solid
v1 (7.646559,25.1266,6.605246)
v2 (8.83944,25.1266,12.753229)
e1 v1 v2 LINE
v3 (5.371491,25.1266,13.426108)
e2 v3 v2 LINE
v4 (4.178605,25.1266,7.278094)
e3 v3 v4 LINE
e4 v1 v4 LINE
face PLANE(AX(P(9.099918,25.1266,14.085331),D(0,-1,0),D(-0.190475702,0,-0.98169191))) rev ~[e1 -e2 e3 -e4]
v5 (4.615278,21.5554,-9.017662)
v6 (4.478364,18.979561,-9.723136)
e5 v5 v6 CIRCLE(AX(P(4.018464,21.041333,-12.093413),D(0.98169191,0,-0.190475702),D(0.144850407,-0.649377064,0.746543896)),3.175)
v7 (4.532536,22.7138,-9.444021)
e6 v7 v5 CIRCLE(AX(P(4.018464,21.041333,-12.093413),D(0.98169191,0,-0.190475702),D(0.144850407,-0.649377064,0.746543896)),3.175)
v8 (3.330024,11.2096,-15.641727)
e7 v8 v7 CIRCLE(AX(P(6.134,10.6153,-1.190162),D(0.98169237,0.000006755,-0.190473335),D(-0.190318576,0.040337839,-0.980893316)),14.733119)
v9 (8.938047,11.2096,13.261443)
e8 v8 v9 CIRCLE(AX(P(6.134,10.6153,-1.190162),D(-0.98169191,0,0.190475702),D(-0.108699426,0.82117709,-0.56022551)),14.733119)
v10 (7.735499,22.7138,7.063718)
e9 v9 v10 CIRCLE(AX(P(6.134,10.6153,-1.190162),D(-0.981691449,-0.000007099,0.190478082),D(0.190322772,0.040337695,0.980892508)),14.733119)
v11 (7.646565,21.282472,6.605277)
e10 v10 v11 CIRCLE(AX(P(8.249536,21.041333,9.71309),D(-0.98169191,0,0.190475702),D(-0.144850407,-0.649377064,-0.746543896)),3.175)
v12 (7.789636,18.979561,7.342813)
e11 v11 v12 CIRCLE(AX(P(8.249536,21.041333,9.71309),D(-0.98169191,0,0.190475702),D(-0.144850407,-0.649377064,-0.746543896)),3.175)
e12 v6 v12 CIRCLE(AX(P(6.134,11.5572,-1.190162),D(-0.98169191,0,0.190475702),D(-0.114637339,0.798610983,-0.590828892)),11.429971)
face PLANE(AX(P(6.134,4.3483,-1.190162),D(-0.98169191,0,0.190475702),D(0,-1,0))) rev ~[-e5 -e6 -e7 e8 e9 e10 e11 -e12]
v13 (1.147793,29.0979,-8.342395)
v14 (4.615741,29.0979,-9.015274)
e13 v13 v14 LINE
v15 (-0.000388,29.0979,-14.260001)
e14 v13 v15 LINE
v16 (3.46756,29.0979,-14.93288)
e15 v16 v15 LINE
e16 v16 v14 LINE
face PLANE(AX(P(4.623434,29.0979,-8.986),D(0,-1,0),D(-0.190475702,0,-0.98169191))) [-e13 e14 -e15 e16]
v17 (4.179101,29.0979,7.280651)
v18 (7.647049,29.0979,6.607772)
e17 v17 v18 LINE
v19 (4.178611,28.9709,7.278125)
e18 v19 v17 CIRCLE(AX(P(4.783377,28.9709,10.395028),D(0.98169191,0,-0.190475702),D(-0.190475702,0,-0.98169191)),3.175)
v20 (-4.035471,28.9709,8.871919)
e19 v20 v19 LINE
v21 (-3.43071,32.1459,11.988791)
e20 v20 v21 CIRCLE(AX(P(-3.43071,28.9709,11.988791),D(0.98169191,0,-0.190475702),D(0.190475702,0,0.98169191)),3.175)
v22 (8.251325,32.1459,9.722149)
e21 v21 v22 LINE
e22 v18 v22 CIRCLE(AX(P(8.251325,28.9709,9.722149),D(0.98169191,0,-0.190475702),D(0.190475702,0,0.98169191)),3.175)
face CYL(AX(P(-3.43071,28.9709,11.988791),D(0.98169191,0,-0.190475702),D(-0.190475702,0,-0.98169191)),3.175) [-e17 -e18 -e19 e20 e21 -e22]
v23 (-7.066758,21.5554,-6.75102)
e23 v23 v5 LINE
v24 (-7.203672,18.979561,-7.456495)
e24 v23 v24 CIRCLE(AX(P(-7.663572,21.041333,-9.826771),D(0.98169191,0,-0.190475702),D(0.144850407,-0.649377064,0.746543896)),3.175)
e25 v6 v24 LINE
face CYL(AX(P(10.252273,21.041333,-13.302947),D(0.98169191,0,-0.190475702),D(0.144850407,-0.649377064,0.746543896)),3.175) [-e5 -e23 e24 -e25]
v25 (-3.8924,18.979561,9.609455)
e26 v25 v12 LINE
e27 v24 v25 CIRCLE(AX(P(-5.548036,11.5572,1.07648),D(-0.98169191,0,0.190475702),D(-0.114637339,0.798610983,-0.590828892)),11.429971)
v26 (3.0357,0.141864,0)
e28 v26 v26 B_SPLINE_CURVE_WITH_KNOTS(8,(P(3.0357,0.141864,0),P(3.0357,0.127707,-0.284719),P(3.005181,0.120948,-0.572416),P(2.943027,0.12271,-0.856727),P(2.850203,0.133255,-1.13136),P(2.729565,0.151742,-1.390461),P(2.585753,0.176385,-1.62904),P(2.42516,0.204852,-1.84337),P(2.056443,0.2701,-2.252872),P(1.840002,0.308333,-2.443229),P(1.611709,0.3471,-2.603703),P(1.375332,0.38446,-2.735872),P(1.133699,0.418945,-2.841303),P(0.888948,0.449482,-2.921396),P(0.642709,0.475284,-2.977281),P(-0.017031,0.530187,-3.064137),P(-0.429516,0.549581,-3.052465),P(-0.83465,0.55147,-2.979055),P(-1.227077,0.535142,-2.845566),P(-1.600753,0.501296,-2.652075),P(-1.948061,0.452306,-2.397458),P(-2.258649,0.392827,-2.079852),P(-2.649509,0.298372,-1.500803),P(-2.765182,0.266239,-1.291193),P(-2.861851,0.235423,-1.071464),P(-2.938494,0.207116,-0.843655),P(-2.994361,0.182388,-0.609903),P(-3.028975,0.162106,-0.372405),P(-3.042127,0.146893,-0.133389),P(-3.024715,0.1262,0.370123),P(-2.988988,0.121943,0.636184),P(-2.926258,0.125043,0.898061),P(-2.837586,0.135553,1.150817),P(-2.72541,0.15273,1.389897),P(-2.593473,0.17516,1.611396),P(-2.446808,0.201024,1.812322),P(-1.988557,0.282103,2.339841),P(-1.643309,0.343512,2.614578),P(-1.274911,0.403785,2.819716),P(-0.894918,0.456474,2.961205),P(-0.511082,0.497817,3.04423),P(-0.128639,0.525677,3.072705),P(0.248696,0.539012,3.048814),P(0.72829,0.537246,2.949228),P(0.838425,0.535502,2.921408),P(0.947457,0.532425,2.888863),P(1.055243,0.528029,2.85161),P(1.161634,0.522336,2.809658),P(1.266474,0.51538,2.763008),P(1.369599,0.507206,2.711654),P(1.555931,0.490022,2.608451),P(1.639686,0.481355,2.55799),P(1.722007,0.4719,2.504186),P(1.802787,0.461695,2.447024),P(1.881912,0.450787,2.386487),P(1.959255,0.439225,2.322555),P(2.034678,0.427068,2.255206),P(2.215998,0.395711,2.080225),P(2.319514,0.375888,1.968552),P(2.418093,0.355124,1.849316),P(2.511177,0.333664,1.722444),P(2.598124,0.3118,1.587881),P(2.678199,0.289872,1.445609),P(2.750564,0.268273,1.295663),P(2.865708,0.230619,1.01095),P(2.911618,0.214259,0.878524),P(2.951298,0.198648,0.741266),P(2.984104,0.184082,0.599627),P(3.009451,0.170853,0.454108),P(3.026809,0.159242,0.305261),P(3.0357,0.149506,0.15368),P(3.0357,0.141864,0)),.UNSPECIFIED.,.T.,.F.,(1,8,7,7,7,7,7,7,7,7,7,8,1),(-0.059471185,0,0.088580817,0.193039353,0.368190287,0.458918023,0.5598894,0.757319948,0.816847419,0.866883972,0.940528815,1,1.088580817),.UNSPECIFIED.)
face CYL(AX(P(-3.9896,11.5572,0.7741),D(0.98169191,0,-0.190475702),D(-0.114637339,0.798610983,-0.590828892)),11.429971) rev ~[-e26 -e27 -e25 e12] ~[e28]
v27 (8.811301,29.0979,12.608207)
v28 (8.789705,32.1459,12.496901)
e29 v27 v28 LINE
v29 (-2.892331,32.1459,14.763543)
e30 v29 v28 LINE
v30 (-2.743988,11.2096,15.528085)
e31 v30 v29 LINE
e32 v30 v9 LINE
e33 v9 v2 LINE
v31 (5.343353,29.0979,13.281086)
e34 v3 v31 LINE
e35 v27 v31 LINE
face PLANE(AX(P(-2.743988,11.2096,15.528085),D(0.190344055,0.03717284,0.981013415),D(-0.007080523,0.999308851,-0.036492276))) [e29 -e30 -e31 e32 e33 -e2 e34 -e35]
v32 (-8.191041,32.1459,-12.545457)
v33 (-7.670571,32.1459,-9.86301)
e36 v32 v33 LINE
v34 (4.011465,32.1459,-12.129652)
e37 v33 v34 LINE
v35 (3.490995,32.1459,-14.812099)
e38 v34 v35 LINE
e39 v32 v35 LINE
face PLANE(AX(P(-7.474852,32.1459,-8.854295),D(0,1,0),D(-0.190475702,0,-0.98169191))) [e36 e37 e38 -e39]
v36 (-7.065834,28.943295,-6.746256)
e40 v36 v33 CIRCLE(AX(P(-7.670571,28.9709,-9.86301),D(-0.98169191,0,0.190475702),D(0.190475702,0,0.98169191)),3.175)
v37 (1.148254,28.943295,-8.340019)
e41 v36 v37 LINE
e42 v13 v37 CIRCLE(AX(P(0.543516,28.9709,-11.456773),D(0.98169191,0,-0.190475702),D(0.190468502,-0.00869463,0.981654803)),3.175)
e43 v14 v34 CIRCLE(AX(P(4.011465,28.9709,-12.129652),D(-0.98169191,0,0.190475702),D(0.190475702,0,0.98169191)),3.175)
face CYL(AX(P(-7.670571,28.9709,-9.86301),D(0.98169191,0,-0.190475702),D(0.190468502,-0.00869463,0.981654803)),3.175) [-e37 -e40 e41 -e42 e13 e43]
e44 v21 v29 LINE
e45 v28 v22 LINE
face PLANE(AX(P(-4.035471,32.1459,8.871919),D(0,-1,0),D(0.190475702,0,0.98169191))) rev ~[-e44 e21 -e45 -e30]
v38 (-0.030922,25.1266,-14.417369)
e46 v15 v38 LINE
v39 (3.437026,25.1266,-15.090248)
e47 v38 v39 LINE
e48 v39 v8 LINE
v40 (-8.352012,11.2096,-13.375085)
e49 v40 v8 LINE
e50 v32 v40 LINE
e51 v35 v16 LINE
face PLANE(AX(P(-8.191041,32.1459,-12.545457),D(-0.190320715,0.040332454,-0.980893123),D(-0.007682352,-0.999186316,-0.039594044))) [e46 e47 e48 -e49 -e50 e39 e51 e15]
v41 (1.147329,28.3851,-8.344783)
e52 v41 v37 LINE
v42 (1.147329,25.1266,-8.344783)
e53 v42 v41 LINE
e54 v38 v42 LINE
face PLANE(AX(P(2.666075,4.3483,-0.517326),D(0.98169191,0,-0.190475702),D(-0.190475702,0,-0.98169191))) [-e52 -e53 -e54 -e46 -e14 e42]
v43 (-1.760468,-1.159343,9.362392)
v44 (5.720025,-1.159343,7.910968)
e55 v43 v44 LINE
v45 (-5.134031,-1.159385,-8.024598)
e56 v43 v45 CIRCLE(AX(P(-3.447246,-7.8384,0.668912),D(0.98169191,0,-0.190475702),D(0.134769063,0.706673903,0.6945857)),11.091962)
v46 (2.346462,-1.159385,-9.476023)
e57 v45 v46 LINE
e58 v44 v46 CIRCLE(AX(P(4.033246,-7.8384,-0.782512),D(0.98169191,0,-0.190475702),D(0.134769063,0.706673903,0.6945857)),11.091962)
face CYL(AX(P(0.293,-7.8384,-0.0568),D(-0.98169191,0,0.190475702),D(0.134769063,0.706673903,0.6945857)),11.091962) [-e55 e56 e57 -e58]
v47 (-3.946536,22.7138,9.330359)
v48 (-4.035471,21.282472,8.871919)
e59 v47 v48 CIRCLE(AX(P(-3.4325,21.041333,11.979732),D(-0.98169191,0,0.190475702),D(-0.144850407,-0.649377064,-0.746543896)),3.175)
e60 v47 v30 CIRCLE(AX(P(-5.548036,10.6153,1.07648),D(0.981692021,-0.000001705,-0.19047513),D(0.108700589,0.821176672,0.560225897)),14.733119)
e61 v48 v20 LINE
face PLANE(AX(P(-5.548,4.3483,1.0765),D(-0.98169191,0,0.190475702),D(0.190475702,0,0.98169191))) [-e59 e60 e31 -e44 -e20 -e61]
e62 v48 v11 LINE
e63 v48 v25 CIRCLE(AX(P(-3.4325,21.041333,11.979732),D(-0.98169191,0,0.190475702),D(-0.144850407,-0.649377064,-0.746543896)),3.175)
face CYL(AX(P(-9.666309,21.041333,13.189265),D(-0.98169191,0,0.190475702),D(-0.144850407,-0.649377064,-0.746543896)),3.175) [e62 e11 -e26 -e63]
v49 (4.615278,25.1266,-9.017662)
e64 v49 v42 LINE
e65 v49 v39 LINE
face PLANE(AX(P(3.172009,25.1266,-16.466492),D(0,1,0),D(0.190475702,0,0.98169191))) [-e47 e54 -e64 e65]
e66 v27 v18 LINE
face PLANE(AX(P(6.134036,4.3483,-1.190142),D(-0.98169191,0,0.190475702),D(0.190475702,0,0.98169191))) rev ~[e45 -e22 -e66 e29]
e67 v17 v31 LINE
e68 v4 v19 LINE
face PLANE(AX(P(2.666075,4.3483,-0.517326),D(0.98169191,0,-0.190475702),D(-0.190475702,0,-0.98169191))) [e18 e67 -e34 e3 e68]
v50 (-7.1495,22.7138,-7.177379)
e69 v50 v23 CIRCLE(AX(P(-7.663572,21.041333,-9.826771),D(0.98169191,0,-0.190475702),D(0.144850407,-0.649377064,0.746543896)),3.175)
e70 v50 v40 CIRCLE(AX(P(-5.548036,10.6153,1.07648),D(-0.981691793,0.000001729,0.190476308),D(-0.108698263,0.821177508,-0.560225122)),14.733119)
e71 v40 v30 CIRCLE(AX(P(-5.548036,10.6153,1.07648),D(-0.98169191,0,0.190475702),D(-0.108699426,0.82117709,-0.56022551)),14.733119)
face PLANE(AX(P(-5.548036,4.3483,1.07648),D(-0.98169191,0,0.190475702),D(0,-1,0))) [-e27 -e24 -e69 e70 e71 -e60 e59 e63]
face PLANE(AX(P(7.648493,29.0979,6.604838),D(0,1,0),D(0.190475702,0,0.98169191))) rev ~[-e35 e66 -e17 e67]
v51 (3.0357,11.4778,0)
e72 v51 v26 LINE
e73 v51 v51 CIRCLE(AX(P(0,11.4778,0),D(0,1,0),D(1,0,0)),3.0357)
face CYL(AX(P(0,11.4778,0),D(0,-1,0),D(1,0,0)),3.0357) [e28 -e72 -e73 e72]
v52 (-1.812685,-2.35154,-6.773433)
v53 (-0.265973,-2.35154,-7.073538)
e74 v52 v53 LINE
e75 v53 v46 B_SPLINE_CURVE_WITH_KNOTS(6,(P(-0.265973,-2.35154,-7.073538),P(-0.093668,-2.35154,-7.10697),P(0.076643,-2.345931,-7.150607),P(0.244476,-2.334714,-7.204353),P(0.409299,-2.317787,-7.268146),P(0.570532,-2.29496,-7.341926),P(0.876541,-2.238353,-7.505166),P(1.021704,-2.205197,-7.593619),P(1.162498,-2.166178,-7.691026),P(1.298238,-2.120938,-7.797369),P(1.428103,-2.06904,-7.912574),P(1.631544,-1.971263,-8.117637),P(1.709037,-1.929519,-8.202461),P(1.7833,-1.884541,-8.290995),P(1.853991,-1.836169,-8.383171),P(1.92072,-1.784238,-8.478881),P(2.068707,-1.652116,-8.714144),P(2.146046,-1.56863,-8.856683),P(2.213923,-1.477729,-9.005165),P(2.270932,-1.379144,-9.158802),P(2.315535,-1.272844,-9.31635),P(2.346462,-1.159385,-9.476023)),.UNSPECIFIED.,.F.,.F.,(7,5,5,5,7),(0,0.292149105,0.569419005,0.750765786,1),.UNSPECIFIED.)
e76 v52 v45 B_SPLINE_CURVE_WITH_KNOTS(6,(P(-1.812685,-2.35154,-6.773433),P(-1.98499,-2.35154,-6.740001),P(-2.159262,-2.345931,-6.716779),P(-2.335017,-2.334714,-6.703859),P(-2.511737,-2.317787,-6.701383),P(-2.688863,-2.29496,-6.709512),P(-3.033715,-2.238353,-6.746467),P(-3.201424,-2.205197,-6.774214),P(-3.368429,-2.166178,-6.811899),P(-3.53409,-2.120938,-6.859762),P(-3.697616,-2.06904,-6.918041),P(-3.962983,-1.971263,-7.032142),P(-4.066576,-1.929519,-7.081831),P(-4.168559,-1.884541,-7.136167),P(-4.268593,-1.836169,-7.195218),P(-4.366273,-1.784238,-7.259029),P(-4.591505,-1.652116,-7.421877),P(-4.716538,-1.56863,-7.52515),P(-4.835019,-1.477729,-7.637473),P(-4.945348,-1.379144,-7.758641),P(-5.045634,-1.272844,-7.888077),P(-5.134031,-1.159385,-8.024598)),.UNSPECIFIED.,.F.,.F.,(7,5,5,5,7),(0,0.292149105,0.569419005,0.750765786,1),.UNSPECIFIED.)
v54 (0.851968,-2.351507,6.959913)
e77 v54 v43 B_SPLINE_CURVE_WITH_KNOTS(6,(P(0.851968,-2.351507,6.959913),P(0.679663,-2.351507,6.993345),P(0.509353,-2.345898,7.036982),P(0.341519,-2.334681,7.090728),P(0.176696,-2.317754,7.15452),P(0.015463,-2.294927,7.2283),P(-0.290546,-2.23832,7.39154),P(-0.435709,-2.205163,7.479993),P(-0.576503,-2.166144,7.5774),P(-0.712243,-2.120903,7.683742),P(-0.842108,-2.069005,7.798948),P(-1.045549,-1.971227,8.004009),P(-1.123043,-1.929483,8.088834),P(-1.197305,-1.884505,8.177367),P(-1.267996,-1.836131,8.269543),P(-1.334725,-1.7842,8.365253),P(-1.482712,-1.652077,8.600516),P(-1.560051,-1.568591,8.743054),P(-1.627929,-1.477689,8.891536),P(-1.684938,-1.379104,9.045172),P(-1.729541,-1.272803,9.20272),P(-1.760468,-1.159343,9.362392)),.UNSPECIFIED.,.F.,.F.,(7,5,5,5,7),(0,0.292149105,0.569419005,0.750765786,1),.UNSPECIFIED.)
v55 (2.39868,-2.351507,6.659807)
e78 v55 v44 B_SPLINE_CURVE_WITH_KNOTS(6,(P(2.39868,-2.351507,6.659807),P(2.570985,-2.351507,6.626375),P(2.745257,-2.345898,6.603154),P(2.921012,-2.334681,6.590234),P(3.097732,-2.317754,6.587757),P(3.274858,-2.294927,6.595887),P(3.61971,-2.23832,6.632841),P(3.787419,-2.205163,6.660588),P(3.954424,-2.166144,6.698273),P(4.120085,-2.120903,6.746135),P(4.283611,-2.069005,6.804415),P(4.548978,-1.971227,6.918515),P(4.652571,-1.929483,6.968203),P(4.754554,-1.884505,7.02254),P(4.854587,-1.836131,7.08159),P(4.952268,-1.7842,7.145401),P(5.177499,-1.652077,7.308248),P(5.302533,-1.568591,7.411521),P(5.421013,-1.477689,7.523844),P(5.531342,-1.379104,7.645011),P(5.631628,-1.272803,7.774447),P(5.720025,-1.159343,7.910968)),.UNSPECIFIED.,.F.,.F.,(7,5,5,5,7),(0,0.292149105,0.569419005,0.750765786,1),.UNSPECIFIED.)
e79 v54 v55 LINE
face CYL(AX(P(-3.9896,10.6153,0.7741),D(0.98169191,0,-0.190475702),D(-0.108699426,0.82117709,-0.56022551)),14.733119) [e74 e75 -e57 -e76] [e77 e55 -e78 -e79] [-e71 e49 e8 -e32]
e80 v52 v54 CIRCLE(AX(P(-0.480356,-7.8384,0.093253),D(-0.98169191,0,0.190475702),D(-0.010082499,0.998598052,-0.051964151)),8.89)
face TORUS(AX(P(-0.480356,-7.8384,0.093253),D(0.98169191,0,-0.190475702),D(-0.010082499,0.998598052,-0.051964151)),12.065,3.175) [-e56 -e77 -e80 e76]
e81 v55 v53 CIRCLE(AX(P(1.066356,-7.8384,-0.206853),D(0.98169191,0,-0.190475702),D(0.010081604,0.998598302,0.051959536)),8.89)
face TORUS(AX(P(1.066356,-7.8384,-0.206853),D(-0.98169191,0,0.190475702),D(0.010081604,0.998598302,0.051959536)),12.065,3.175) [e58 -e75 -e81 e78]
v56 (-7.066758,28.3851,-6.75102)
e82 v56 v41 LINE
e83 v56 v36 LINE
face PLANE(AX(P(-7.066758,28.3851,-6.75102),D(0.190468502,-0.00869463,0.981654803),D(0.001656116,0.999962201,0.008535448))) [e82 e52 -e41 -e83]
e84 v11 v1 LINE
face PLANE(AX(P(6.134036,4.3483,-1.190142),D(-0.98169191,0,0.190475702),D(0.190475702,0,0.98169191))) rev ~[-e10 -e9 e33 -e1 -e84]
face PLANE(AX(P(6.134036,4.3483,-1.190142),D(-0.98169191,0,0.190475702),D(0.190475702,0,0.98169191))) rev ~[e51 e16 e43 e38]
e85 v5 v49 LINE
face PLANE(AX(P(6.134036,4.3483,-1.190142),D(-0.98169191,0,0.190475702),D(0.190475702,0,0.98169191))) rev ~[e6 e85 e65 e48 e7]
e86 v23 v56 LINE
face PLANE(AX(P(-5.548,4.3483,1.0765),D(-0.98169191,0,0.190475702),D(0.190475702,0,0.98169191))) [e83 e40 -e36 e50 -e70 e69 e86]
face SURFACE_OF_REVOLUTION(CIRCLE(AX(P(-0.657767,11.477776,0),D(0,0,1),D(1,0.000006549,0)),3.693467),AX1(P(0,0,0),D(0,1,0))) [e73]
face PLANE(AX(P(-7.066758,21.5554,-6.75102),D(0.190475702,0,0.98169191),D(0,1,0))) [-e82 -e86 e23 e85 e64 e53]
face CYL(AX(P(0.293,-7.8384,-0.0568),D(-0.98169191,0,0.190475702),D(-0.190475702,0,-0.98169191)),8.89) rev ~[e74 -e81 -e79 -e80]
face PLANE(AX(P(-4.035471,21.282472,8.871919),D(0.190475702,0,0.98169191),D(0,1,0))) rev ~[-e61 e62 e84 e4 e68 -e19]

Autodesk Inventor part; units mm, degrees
ref_plane "YZ Plane" through (0, 0, 0) normal (1, 0, 0) x (0, 1, 0)
sketch "Sketch1" plane through (0, 0, 0) normal (0, 0, 1) x (1, 0, 0)
  line L0 (0, 0) -> (0, 15.1122)
  line L1 (3.0357, 11.4778) -> (3.0357, 0)
  line L2 (3.0357, 0) -> (0, 0)
  arc A0 (3.0357, 11.4778) -> (0, 15.1122) centre (-0.6577, 11.4778) ccw
ref_plane "Work Plane3" through (0, 17.8837, 0) normal (0, 1, 0) x (1, 0, 0)
ref_plane "Work Plane1" through (-3.9896, 4.3483, 0.7741) normal (-0.9816919, 0, 0.1904757) x (0, -1, 0)
sketch "Sketch3" plane through (-3.9896, 4.3483, 0.7741) normal (-0.9816919, 0, 0.1904757) x (0, -1, 0)
  arc A0 (-16.337, -6.8791) -> (-16.337, 6.8791) centre (-7.2089, 0) ccw
  line L0 (-13.5354, -0.5887) -> (0.7521, -0.5887) projected
  line L1 (-13.5354, 0.6171) -> (0.7521, 0.6171) projected
  line L2 (-7.2089, 0) -> (-7.9901, -0.5887)
  line L3 (-16.337, -6.8791) -> (-18.3655, -8.4078)
  line L4 (-7.2089, 0) -> (-8.0277, 0.6171)
  line L5 (-16.337, 6.8791) -> (-18.3655, 8.4078)
  arc A1 (-18.3655, -8.4078) -> (-18.3655, 8.4078) centre (-6.267, 0) ccw
extrude "Extrusion2" add sketch "Sketch3" along normal blind 1.5875 and the other way blind 10.3124
fillet "Fillet1" radius 3.175 2 edges at (-1.0173, 20.6854, -6.81) (1.6033, 20.6854, 6.6963)
ref_plane "Work Plane2" through (0.293, 4.3483, -0.0568) normal (0.9816919, 0, -0.1904757) x (-0.1904757, 0, -0.9816919)
sketch "Sketch4" plane through (0.293, 4.3483, -0.0568) normal (0.9816919, 0, -0.1904757) x (-0.1904757, 0, -0.9816919)
  circle A0 centre (0, -12.1867) radius 8.89
  arc A1 (-8.4078, 18.3655) -> (8.4078, 18.3655) centre (0, 7.2089) ccw projected
  arc A2 (-7.848, -4.3483) -> (7.848, -4.3483) centre (0, -12.1867) ccw
  point P0 (0, -4.3483)
  point P1 (5.8384, -5.4826)
  point P2 (-5.8384, -5.4826)
  dimension "d17" = 17.78
extrude "Extrusion3" add sketch "Sketch4" along normal mid plane 7.62 contours A0 A1 A2
fillet "Fillet2" radius 3.175 2 edges at (-3.4473, -16.7283, 0.6689) (4.0332, -16.7283, -0.7826)
sketch "Sketch5" plane through (-5.548, 4.3483, 1.0765) normal (-0.9816919, 0, 0.1904757) x (0.1904757, 0, 0.9816919)
  arc A0 (-8.6921, 14.6313) -> (-8.4078, 18.3655) centre (-11.1066, 16.6931) ccw
  line L0 (-7.9735, 17.2071) -> (-7.9735, 24.0368)
  line L1 (-10.116, 16.8437) -> (-10.116, 16.3667)
  arc A1 (8.4078, 18.3655) -> (8.6921, 14.6313) centre (11.1066, 16.6931) ccw
  line L2 (7.9735, 17.2071) -> (7.9735, 24.0368)
  line L3 (10.0556, 16.9067) -> (10.0556, 16.0648)
  line L4 (-8.0331, 17.1837) -> (-7.9735, 17.2071)
  line L5 (-7.9735, 24.0368) -> (-7.9408, 27.7976)
  line L6 (-10.116, 27.7976) -> (-7.9408, 27.7976)
  line L7 (7.9408, 27.7976) -> (10.0556, 27.7976)
  arc A2 (-8.4078, 18.3655) -> (8.4078, 18.3655) centre (0, 7.2089) ccw
  line L8 (7.9408, 27.7976) -> (13.9423, 27.7976)
  line L9 (13.9423, 27.7976) -> (13.9423, 6.3292)
  line L10 (13.9423, 6.3292) -> (13.9416, 6.3292)
  line L11 (7.9408, 16.452) -> (7.9408, 27.7976)
  line L12 (-7.9408, 27.7976) -> (-13.876, 27.7976)
  line L13 (-13.876, 27.7976) -> (-13.876, 6.3292)
  line L14 (-7.9408, 16.452) -> (-7.9408, 27.7976)
  arc A3 (13.9421, 6.3267) -> (7.9408, 16.452) centre (-4.3172, 2.3454) ccw
  arc A4 (-7.9408, 16.452) -> (-13.876, 6.3292) centre (3.6251, 2.8693) ccw
  line L15 (-8.1275, 6.3292) -> (-7.9408, 6.3292)
  line L16 (-13.876, 6.3292) -> (-13.876, -0.5906) construction
  line L17 (-13.876, -0.5906) -> (-10.116, -4.3483) construction
  arc A5 (-6.9947, -6.6998) -> (6.9947, -6.6998) centre (0, -12.1867) ccw
  line L18 (-10.116, -4.3483) -> (-7.0424, -6.7611) construction
  line L19 (-7.0424, -6.7611) -> (0, -8.3144) construction
  line L20 (0, -8.3144) -> (5.2825, -7.1493) construction
  line L21 (13.9421, 5.8129) -> (13.9421, 6.3267) construction
  arc A6 (10.0377, -3.7332) -> (10.431, -3.4046) centre (1.9746, 6.3181) ccw
  spline S0 degree 4 poles (-13.876, 6.3292) (-13.876, -0.5906) (-10.116, -4.3483) (-7.0424, -6.7611) (0, -8.3144) (5.2825, -7.1493) (8.5532, -4.7704) (10.0372, -3.7336) (10.0377, -3.7332) knots 1 1 1 1 1 2 3 4 5 5.000386 5.000386 5.000386 5.000386 5.000386
  spline S1 degree 4 poles (13.9158, 4.457) (13.9287, 4.8802) (13.9376, 5.3315) (13.9421, 5.8129) (13.9421, 6.3267) knots 0 0 0 0 0 1 1 1 1 1
  line L22 (5.2825, -7.1493) -> (8.5532, -4.7704) construction
  line L23 (8.5532, -4.7704) -> (10.0372, -3.7336) construction
  line L24 (10.0372, -3.7336) -> (10.0377, -3.7332) construction
  arc A7 (10.431, -3.4046) -> (13.9421, 6.3267) centre (0.7781, 5.5773) ccw
  line L25 (13.9158, 4.457) -> (13.9287, 4.8802) construction
  line L26 (13.9287, 4.8802) -> (13.9376, 5.3315) construction
  line L27 (13.9376, 5.3315) -> (13.9421, 5.8129) construction
  point P0 (0, -4.3483)
  point P1 (10.0556, 24.2784)
  point P2 (7.9735, 31.5584)
  point P3 (-7.9735, 31.5584)
  point P4 (-10.116, 31.5584)
  point P5 (-10.116, 27.7976)
  point P6 (-13.876, 8.8266)
  point P7 (7.9408, 16.9341)
  point P8 (13.9423, 8.0887)
  point P9 (10.0556, 27.7976)
  point P10 (5.8384, -5.4826)
  point P11 (-5.8384, -5.4826)
sketch "Sketch6" plane through (-5.548, 4.3483, 1.0765) normal (-0.9816919, 0, 0.1904757) x (0.1904757, 0, 0.9816919)
  point P0 (0, -4.3483)
revolve "Revolution3" add sketch "Sketch1" angle 360 about axis through (0, 0, 0) along (0, 1, 0)
extrude "Extrusion7" add sketch "Sketch5" against normal up to surface (11.8999 mm away) contours A0 A2 L13 L12 L6 L5 L0 | A2 A1 L11 L7 L8 L9
fillet "Fillet4" radius 3.175 2 edges at (-1.2195, 32.1459, -7.8522) (1.8055, 32.1459, 7.7386)
sketch "Sketch9" plane through (-5.548, 4.3483, 1.0765) normal (-0.9816919, 0, 0.1904757) x (0.1904757, 0, 0.9816919)
  line L0 (-13.876, 11.2188) -> (-13.876, 27.7976) projected
  line L1 (-13.876, 27.7976) -> (-14.7211, 6.8613)
  arc A0 (-13.876, 11.2188) -> (13.9423, 11.0291) centre (0, 6.267) ccw projected
  line L2 (14.7211, 6.8613) -> (13.9423, 27.7976)
  line L3 (-13.876, 27.7976) -> (-11.1435, 27.7976) projected
  line L4 (-13.876, 27.7976) -> (-12.5098, 7.6225)
  line L5 (-12.5098, 7.6225) -> (-14.7211, 6.8613)
  line L6 (14.7211, 6.8613) -> (11.1518, 18.0483)
  line L7 (13.9423, 27.7976) -> (13.9423, 11.0291) projected
  line L8 (11.1518, 18.0483) -> (13.9423, 27.7976)
  point P0 (0, -4.3483)
extrude "Extrusion10" add sketch "Sketch9" against normal up to surface (11.8999 mm away) contours A0 L1 L0 | A0 L7 L2
sketch "Sketch10" plane through (6.134, 4.3483, -1.1902) normal (0.9816919, 0, -0.1904757) x (-0.1904757, 0, -0.9816919)
  line L0 (-7.9408, 16.9341) -> (-7.9408, 24.6226) projected
  line L1 (-7.9408, 24.7496) -> (-15.5608, 24.7496)
  line L2 (-15.5608, 24.7496) -> (-15.5608, 20.7783)
  line L3 (-15.5608, 20.7783) -> (-7.9408, 20.7783)
  line L4 (-7.9408, 20.7783) -> (-7.9408, 24.7496)
  line L5 (-11.1158, 27.7976) -> (-13.9423, 27.7976) projected
  line L6 (7.9408, 24.7496) -> (15.5608, 24.7496)
  line L7 (15.5608, 24.7496) -> (15.5608, 20.7783)
  line L8 (15.5608, 20.7783) -> (7.9408, 20.7783)
  line L9 (7.9408, 20.7783) -> (7.9408, 24.7496)
  point P0 (0, -4.3483)
  point P1 (7.9408, 24.6226)
  point P2 (-7.9408, 20.7783)
  point P3 (-7.9408, 24.6226)
  dimension "d48" = 3.048
  dimension "d49" = 7.62
  dimension "d50" = 3.9712
extrude "Extrusion12" cut sketch "Sketch10" against normal blind 3.5306
properties part number "Clip11"
